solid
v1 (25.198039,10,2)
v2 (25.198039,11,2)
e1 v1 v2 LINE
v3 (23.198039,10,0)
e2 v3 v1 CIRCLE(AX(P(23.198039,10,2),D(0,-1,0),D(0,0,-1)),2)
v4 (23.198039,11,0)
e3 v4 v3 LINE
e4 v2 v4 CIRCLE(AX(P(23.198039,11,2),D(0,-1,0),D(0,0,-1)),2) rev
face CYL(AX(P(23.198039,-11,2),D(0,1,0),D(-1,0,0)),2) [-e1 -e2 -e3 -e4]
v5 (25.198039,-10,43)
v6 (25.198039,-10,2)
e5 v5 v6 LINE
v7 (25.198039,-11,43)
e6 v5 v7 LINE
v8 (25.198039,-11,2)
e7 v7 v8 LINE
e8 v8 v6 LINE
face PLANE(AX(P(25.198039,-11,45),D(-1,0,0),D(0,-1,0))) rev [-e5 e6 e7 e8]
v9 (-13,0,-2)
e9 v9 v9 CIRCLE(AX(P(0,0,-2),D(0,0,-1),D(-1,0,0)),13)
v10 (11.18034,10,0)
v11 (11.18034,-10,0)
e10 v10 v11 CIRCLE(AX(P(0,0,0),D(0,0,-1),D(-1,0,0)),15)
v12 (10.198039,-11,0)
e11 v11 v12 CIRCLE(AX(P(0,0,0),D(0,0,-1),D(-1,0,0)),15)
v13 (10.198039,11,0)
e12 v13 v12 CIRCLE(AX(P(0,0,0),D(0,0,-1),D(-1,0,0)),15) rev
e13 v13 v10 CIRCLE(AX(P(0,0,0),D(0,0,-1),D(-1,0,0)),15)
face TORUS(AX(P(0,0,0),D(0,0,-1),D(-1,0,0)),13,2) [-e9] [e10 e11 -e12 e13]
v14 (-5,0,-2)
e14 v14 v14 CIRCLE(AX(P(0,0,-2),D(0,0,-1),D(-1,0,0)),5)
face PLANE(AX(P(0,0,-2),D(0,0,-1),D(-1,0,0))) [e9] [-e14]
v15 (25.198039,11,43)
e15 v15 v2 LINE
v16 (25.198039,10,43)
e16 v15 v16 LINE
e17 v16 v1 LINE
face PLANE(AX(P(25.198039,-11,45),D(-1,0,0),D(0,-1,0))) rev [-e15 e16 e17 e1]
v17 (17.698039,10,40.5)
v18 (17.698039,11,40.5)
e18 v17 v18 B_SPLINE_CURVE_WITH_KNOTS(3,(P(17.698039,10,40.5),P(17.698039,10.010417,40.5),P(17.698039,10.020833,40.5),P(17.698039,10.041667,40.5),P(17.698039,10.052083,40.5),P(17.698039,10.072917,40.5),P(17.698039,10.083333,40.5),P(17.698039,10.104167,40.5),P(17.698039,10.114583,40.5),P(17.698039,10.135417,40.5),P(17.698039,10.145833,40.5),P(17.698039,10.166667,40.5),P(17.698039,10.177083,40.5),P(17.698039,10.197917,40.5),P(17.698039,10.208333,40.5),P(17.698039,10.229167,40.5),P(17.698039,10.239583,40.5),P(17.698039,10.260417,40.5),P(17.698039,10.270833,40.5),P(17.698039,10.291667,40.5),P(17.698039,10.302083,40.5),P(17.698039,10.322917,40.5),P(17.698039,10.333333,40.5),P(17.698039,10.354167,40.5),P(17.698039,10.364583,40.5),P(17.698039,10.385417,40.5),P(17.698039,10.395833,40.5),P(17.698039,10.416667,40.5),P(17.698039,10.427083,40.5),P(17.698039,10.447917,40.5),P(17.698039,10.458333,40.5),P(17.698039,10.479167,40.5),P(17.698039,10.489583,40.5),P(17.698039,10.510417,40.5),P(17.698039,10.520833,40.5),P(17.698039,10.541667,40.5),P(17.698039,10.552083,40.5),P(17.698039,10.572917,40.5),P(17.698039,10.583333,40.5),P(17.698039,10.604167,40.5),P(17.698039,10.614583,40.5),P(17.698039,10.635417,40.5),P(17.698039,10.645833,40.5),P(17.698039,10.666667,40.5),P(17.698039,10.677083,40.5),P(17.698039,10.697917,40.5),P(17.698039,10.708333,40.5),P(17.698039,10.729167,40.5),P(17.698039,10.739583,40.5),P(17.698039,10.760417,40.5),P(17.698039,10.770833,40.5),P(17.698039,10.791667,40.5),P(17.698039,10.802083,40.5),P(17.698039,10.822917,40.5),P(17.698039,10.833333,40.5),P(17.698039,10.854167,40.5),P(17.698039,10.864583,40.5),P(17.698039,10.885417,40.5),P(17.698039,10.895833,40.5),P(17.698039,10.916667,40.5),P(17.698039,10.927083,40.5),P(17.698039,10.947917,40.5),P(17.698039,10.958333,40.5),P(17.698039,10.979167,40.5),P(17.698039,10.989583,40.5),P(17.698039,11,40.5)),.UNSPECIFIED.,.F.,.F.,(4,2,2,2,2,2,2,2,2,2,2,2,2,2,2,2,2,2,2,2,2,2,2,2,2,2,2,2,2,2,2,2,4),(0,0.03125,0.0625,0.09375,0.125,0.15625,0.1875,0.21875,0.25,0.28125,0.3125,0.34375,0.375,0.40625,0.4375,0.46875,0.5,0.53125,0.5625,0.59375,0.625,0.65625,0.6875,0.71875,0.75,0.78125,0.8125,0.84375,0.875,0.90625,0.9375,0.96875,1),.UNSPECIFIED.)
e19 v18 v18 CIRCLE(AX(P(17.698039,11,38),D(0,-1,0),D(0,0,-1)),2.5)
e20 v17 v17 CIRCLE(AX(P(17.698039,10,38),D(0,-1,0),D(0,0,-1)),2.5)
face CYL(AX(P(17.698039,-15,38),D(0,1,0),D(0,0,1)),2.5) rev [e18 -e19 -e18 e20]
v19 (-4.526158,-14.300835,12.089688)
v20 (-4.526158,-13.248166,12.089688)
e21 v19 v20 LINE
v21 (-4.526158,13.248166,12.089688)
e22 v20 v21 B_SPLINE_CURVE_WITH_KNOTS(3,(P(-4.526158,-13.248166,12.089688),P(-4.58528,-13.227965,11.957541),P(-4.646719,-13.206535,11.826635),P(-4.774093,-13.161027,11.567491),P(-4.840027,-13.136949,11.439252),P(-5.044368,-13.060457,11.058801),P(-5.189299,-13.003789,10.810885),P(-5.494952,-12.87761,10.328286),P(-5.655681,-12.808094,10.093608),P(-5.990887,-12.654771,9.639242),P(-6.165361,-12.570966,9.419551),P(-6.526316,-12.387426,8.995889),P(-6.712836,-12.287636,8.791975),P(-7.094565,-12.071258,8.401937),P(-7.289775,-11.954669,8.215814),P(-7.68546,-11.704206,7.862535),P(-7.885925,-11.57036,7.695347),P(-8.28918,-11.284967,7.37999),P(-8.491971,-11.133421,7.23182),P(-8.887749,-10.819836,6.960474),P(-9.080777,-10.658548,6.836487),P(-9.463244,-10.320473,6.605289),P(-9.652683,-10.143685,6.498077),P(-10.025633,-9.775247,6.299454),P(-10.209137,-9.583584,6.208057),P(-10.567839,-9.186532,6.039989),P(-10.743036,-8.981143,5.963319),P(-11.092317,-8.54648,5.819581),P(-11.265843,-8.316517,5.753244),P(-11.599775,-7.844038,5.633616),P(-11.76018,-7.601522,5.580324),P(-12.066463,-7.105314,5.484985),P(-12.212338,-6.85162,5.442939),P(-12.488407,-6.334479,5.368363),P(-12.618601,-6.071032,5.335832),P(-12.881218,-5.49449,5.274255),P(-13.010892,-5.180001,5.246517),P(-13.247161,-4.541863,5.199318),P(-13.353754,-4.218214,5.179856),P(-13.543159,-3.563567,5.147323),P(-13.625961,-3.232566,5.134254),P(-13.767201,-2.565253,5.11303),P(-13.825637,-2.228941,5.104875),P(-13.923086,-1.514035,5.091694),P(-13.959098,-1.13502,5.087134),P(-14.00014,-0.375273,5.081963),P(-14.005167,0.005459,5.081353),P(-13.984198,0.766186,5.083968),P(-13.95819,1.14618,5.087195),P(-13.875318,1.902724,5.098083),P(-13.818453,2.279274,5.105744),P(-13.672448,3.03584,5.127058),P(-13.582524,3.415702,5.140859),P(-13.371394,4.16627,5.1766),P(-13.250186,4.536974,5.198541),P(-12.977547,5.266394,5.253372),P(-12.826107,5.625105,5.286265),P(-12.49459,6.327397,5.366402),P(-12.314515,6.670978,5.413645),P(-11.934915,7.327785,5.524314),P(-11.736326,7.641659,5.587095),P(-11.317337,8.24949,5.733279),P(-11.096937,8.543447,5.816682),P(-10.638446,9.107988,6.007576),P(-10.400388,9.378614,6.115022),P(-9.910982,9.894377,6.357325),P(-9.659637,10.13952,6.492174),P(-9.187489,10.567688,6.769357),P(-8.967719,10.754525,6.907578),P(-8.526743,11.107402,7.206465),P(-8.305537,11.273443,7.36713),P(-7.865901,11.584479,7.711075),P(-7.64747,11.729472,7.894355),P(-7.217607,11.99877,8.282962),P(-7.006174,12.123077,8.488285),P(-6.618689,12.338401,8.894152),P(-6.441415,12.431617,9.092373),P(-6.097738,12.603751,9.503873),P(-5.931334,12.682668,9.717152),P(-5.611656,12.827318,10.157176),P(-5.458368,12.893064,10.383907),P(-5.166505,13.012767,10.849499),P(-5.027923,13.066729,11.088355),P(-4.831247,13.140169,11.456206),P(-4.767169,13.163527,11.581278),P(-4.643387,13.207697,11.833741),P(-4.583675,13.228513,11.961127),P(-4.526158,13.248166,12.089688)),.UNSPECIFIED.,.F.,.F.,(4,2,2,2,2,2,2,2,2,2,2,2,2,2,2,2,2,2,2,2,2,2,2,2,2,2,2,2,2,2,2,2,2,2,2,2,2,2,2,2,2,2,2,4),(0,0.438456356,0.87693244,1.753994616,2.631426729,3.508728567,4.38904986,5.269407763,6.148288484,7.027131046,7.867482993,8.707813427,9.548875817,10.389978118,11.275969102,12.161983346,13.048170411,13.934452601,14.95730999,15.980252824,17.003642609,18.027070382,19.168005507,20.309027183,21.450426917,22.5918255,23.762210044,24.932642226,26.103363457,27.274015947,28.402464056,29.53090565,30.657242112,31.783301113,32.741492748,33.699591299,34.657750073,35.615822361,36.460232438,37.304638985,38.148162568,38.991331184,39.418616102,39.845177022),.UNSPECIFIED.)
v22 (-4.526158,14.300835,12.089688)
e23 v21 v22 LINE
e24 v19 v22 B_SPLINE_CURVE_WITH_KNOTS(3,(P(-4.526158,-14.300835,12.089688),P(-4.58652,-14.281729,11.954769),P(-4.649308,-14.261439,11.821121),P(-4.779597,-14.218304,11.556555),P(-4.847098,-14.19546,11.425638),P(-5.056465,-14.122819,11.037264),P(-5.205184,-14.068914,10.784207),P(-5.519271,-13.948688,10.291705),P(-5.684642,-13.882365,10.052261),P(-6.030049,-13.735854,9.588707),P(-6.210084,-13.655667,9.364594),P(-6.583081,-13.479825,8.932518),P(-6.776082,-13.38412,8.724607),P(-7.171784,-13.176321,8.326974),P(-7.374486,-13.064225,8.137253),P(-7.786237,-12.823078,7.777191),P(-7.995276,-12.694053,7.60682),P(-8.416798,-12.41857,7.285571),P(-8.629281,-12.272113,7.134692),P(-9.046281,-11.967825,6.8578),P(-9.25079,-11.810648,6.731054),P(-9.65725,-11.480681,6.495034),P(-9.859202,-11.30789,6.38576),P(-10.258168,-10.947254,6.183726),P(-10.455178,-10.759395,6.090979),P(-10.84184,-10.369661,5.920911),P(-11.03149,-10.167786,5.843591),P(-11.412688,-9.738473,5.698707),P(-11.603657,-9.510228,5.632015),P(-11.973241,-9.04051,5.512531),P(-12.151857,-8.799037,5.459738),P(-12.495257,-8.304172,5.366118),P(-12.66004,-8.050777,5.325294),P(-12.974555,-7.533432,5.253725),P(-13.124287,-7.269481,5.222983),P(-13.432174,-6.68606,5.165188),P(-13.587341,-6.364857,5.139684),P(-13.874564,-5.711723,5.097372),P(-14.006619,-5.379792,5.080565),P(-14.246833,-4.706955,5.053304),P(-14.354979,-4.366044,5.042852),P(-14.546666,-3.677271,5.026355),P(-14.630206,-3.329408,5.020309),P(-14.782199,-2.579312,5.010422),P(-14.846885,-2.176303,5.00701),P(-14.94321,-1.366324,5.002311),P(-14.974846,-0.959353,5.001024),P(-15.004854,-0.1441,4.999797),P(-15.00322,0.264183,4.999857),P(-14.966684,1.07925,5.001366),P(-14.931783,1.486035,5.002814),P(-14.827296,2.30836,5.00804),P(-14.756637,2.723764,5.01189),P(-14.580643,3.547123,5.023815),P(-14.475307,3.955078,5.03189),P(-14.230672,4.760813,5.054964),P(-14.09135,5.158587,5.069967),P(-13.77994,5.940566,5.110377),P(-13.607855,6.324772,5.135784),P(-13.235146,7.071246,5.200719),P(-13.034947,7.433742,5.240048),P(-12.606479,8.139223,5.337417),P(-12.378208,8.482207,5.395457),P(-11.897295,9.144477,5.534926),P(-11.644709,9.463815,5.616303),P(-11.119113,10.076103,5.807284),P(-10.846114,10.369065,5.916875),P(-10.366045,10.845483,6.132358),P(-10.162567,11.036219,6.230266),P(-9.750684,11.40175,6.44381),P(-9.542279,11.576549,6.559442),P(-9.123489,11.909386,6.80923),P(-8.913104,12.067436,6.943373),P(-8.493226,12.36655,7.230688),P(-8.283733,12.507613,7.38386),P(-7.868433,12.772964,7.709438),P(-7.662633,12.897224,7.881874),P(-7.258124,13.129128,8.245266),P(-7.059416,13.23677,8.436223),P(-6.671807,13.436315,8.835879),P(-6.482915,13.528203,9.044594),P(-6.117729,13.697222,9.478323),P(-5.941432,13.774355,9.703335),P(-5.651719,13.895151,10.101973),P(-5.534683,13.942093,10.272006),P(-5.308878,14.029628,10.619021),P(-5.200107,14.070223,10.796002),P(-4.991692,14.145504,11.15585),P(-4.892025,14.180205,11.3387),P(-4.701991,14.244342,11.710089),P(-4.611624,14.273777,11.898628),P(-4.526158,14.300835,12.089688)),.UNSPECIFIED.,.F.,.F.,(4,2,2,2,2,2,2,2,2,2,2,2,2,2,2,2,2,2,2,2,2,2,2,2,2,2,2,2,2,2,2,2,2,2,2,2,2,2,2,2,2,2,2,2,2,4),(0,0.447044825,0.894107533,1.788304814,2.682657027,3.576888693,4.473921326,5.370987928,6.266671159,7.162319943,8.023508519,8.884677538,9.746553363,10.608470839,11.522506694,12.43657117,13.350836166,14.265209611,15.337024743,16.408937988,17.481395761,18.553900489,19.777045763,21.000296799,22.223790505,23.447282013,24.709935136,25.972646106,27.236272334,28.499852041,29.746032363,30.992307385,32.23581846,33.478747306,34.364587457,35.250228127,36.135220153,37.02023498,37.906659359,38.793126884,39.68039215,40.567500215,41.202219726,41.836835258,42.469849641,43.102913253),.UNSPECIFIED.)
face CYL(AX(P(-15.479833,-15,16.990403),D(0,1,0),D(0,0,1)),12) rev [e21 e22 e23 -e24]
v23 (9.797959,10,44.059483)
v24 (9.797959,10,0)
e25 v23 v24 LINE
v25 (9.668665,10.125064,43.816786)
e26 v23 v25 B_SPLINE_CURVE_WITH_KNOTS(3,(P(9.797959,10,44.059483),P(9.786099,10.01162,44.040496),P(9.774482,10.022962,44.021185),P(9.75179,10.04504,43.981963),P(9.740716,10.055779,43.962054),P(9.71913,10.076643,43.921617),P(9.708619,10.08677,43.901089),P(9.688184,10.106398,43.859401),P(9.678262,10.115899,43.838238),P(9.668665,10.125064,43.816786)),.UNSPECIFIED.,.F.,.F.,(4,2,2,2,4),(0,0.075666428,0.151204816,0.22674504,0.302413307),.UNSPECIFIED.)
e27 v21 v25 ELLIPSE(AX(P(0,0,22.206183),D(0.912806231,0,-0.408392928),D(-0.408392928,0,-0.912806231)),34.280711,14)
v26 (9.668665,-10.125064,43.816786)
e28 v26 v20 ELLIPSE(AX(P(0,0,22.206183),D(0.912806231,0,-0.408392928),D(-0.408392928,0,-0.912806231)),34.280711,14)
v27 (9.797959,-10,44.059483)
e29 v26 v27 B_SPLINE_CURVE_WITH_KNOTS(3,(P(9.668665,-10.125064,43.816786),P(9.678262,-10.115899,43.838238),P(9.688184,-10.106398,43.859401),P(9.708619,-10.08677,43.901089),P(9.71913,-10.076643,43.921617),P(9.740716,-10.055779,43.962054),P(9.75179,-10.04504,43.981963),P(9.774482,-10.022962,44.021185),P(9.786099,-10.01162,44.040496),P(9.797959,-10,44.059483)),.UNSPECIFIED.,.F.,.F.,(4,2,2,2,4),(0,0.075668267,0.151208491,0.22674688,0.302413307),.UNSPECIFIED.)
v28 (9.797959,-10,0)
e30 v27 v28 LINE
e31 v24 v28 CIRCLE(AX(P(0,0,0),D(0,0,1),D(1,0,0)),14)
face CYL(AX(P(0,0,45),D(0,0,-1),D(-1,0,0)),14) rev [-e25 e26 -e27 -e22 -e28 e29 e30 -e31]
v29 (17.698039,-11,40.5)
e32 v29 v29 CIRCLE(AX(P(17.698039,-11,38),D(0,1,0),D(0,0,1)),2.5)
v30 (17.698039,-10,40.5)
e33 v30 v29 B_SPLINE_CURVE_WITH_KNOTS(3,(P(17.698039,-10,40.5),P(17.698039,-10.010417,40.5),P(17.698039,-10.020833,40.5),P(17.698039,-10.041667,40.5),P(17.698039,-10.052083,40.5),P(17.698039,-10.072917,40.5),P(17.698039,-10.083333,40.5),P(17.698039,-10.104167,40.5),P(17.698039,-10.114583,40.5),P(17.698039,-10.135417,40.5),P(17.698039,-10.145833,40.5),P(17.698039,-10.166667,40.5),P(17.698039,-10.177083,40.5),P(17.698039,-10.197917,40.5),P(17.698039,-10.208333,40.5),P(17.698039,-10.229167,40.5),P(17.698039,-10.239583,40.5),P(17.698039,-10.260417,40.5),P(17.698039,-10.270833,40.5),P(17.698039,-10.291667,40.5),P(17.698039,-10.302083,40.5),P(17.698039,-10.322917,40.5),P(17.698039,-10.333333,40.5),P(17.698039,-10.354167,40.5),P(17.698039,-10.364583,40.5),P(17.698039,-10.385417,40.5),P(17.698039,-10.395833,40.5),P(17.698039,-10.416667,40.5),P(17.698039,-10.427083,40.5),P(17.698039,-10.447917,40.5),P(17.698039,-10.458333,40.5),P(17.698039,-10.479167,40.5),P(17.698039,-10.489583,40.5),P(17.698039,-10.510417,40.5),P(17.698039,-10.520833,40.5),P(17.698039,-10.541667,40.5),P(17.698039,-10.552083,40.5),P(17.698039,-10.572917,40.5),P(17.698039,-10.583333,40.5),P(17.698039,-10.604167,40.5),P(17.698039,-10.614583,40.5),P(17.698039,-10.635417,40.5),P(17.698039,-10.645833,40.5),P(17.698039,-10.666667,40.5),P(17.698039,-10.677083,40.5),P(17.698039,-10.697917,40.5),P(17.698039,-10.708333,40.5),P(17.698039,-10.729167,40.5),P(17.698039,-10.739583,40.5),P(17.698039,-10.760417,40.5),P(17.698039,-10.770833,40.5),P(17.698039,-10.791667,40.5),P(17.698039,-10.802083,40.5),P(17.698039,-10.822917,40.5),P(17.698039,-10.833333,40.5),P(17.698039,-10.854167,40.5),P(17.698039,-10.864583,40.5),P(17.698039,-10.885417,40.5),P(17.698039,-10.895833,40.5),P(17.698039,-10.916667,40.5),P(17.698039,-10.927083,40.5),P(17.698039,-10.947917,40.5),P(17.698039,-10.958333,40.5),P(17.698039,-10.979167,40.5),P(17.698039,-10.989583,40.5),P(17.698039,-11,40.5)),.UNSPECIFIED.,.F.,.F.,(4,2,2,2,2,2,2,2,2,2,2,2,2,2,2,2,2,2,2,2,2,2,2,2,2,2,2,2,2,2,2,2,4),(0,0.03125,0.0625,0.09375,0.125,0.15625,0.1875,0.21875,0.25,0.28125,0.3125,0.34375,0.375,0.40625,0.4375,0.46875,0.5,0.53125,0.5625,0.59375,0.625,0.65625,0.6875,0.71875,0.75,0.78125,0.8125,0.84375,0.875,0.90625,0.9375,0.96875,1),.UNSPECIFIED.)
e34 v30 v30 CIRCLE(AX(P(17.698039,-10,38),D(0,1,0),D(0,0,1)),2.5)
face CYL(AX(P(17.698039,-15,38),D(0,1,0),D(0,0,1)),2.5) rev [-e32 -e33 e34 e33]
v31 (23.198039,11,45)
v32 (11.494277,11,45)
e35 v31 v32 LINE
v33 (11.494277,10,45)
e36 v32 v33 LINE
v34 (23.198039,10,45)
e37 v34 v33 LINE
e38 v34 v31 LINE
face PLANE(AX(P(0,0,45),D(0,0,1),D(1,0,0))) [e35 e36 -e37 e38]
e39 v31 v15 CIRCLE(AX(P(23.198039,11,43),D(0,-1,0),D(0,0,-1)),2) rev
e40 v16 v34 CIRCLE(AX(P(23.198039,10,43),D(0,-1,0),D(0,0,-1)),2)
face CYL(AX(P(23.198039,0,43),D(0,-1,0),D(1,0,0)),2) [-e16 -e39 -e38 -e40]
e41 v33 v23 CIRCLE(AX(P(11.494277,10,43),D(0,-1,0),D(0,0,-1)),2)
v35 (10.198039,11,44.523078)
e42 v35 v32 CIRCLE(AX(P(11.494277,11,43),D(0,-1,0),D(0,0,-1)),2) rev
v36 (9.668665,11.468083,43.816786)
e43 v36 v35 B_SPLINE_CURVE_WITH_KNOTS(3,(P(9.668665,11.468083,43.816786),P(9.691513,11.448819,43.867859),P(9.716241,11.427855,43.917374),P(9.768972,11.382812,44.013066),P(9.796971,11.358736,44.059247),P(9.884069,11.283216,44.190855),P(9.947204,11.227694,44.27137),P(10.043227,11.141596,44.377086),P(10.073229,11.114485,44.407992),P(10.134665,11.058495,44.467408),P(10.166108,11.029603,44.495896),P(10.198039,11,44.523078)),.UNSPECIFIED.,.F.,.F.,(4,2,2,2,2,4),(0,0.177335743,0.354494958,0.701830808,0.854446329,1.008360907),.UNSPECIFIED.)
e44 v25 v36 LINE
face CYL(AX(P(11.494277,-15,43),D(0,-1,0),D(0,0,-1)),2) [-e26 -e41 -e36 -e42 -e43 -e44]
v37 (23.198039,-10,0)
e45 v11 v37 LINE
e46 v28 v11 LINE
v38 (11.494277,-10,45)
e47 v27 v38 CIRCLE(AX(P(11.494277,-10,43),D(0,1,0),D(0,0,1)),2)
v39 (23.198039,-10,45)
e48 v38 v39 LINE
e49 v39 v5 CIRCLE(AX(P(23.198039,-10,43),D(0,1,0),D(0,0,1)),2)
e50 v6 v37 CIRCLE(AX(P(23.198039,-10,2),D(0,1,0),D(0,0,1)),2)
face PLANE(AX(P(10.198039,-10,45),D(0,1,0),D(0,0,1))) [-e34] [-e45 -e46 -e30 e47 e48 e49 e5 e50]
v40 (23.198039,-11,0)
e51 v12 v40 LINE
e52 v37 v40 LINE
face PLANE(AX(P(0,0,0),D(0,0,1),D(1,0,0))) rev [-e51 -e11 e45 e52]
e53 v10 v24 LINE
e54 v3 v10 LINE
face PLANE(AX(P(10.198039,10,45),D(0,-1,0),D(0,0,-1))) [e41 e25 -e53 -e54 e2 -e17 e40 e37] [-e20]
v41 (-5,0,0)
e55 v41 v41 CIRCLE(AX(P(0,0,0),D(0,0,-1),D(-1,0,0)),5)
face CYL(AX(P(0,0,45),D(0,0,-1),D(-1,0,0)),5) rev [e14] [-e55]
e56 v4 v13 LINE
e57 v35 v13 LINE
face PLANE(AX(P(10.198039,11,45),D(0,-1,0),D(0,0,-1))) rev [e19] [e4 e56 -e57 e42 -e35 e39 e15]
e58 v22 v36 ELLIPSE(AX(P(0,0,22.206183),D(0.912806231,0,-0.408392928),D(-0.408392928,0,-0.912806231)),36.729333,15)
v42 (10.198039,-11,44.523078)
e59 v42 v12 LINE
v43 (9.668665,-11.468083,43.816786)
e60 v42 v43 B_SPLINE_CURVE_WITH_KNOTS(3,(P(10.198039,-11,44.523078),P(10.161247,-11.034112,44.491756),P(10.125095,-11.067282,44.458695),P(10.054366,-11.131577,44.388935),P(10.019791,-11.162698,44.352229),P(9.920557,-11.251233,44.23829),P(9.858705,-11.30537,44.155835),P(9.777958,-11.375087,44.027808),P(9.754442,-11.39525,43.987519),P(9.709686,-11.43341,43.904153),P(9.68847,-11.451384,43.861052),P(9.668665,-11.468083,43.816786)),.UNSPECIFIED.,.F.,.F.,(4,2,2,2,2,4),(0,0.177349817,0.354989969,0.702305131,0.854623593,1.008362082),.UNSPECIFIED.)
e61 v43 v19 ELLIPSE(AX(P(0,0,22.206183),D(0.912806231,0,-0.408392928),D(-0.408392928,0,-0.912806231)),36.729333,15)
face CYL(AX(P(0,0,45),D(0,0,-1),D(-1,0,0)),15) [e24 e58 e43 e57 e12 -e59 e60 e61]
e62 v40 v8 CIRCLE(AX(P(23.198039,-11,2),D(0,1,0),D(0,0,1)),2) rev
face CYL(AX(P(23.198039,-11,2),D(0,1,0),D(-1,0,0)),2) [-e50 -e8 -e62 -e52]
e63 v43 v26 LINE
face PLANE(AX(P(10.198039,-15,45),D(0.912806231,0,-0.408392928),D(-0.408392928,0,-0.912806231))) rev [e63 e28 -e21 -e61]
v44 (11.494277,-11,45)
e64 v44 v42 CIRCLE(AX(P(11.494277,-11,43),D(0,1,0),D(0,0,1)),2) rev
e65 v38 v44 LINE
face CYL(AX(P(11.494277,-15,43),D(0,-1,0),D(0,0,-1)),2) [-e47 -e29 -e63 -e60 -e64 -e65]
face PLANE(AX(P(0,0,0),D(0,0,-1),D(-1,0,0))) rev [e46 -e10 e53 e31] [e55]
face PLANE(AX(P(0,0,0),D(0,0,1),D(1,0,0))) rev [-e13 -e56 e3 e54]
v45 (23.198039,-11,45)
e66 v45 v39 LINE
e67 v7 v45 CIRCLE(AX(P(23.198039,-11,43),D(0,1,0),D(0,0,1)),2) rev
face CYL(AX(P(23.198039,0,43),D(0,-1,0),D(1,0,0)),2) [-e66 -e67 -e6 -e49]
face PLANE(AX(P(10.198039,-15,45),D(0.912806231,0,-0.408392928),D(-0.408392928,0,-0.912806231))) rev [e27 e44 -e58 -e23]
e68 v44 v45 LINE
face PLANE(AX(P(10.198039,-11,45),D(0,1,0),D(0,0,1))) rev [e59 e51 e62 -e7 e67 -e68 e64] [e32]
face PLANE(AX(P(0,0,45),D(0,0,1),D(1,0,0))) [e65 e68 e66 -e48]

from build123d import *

# Parameters (mm, degrees)
EXTRUDE_1_DEPTH          = 45
SHELL_11_T               = -1
CUT_EXTRUDE_3_DEPTH      = 54.711648372
CUT_EXTRUDE_3_DEPTH_BACK = 54.711648372
CUT_EXTRUDE_5_DEPTH      = 58.757607161
CUT_EXTRUDE_5_DEPTH_BACK = 58.757607161
SKETCH_3_R               = 2.5
EXTRUDE_START            = 2
SKETCH_5_R               = 15
EXTRUDE_4_DEPTH          = 2
FILLET_5_R               = 2
CUT_EXTRUDE_6_DEPTH      = 56.398025084
CUT_EXTRUDE_6_DEPTH_BACK = 56.398025084
SKETCH_6_R               = 5
FILLET_6_R               = 2
FILLET_7_R               = 2


with BuildPart() as part:
    # 草图1 → 凸台-拉伸1 (new body)
    with BuildSketch(Plane.XY):
        with BuildLine():
            Line((10.198039027, -11), (25.198039027, -11))
            Line((25.198039027, -11), (25.198039027, 11))
            Line((25.198039027, 11), (10.198039027, 11))
            ThreePointArc((10.198039027, 11), (-15, 0), (10.198039027, -11))
        make_face()
    extrude(amount=EXTRUDE_1_DEPTH)

    # 抽壳11
    shell_11_openings = [part.faces().sort_by_distance(p)[0] for p in [
        (5.138978192, 0, 45),
        (5.138978192, 0, 0),
        (25.198039027, 0, 22.5),
    ]]
    offset(amount=SHELL_11_T, openings=shell_11_openings, kind=Kind.INTERSECTION)

    # 草图2 → 切除-拉伸3 (cut, two sides: drawn at the far end of the back side and taken through both)
    with BuildSketch(Plane(origin=(0, 0, 0), x_dir=(1, 0, 0), z_dir=(0, 1, 0)).offset(-CUT_EXTRUDE_3_DEPTH_BACK)):
        with BuildLine():
            Line((10.198039027, -45), (-4.526158017, -12.089687708))
            ThreePointArc((-4.526158017, -12.089687708), (-8.753229506, -7.052958097), (-15, -5))
            Line((-15, -5), (-15, -45))
            Line((-15, -45), (10.198039027, -45))
        make_face()
    extrude(amount=CUT_EXTRUDE_3_DEPTH + CUT_EXTRUDE_3_DEPTH_BACK, mode=Mode.SUBTRACT)

    # 草图3 → 切除-拉伸5 (cut, two sides: drawn at the far end of the back side and taken through both)
    with BuildSketch(Plane(origin=(0, 11, 0), x_dir=(1, 0, 0), z_dir=(0, 1, 0)).offset(-CUT_EXTRUDE_5_DEPTH_BACK)):
        with Locations(Location((17.698039027, -38, 0), (0, 0, 270))):
            Circle(SKETCH_3_R)
    extrude(amount=CUT_EXTRUDE_5_DEPTH + CUT_EXTRUDE_5_DEPTH_BACK, mode=Mode.SUBTRACT)

    # 草图5 → 凸台-拉伸4 (add)
    with BuildSketch(Plane(origin=(0, 0, 0), x_dir=(-1, 0, 0), z_dir=(0, 0, -1)).offset(EXTRUDE_START)):
        Circle(SKETCH_5_R)
    extrude(amount=-EXTRUDE_4_DEPTH)

    # 圆角5
    # the kernel refuses this fillet: 2 mm, written as the material it takes off along each edge
    with BuildSketch(Plane(origin=(0, 0, -2), x_dir=(-1, 0, 0), z_dir=(0, -1, 0))) as fillet_5_piece_1:
        with BuildLine():
            CenterArc((15 - FILLET_5_R, -FILLET_5_R), FILLET_5_R, 0, 90)
            Line((15 - FILLET_5_R, 0), (15, 0))
            Line((15, 0), (15, -FILLET_5_R))
        make_face()
    revolve(axis=Axis((0, 0, -2), (0, 0, -1)), mode=Mode.SUBTRACT)

    # 草图6 → 切除-拉伸6 (cut, two sides: drawn at the far end of the back side and taken through both)
    with BuildSketch(Plane(origin=(0, 0, -2), x_dir=(-1, 0, 0), z_dir=(0, 0, -1)).offset(-CUT_EXTRUDE_6_DEPTH_BACK)):
        Circle(SKETCH_6_R)
    extrude(amount=CUT_EXTRUDE_6_DEPTH + CUT_EXTRUDE_6_DEPTH_BACK, mode=Mode.SUBTRACT)

    # 圆角6
    fillet_6_edges = [part.edges().sort_by_distance(p)[0] for p in [
        (25.198039027, 10.5, 0),
        (25.198039027, 10.5, 45),
    ]]
    fillet(fillet_6_edges, radius=FILLET_6_R)

    # 圆角7
    fillet_7_edges = [part.edges().sort_by_distance(p)[0] for p in [
        (10.198039027, -10.5, 45),
        (10.198039027, 10.5, 45),
        (25.198039027, -10.5, 0),
        (25.198039027, -10.5, 45),
    ]]
    fillet(fillet_7_edges, radius=FILLET_7_R)


solid = part.part
